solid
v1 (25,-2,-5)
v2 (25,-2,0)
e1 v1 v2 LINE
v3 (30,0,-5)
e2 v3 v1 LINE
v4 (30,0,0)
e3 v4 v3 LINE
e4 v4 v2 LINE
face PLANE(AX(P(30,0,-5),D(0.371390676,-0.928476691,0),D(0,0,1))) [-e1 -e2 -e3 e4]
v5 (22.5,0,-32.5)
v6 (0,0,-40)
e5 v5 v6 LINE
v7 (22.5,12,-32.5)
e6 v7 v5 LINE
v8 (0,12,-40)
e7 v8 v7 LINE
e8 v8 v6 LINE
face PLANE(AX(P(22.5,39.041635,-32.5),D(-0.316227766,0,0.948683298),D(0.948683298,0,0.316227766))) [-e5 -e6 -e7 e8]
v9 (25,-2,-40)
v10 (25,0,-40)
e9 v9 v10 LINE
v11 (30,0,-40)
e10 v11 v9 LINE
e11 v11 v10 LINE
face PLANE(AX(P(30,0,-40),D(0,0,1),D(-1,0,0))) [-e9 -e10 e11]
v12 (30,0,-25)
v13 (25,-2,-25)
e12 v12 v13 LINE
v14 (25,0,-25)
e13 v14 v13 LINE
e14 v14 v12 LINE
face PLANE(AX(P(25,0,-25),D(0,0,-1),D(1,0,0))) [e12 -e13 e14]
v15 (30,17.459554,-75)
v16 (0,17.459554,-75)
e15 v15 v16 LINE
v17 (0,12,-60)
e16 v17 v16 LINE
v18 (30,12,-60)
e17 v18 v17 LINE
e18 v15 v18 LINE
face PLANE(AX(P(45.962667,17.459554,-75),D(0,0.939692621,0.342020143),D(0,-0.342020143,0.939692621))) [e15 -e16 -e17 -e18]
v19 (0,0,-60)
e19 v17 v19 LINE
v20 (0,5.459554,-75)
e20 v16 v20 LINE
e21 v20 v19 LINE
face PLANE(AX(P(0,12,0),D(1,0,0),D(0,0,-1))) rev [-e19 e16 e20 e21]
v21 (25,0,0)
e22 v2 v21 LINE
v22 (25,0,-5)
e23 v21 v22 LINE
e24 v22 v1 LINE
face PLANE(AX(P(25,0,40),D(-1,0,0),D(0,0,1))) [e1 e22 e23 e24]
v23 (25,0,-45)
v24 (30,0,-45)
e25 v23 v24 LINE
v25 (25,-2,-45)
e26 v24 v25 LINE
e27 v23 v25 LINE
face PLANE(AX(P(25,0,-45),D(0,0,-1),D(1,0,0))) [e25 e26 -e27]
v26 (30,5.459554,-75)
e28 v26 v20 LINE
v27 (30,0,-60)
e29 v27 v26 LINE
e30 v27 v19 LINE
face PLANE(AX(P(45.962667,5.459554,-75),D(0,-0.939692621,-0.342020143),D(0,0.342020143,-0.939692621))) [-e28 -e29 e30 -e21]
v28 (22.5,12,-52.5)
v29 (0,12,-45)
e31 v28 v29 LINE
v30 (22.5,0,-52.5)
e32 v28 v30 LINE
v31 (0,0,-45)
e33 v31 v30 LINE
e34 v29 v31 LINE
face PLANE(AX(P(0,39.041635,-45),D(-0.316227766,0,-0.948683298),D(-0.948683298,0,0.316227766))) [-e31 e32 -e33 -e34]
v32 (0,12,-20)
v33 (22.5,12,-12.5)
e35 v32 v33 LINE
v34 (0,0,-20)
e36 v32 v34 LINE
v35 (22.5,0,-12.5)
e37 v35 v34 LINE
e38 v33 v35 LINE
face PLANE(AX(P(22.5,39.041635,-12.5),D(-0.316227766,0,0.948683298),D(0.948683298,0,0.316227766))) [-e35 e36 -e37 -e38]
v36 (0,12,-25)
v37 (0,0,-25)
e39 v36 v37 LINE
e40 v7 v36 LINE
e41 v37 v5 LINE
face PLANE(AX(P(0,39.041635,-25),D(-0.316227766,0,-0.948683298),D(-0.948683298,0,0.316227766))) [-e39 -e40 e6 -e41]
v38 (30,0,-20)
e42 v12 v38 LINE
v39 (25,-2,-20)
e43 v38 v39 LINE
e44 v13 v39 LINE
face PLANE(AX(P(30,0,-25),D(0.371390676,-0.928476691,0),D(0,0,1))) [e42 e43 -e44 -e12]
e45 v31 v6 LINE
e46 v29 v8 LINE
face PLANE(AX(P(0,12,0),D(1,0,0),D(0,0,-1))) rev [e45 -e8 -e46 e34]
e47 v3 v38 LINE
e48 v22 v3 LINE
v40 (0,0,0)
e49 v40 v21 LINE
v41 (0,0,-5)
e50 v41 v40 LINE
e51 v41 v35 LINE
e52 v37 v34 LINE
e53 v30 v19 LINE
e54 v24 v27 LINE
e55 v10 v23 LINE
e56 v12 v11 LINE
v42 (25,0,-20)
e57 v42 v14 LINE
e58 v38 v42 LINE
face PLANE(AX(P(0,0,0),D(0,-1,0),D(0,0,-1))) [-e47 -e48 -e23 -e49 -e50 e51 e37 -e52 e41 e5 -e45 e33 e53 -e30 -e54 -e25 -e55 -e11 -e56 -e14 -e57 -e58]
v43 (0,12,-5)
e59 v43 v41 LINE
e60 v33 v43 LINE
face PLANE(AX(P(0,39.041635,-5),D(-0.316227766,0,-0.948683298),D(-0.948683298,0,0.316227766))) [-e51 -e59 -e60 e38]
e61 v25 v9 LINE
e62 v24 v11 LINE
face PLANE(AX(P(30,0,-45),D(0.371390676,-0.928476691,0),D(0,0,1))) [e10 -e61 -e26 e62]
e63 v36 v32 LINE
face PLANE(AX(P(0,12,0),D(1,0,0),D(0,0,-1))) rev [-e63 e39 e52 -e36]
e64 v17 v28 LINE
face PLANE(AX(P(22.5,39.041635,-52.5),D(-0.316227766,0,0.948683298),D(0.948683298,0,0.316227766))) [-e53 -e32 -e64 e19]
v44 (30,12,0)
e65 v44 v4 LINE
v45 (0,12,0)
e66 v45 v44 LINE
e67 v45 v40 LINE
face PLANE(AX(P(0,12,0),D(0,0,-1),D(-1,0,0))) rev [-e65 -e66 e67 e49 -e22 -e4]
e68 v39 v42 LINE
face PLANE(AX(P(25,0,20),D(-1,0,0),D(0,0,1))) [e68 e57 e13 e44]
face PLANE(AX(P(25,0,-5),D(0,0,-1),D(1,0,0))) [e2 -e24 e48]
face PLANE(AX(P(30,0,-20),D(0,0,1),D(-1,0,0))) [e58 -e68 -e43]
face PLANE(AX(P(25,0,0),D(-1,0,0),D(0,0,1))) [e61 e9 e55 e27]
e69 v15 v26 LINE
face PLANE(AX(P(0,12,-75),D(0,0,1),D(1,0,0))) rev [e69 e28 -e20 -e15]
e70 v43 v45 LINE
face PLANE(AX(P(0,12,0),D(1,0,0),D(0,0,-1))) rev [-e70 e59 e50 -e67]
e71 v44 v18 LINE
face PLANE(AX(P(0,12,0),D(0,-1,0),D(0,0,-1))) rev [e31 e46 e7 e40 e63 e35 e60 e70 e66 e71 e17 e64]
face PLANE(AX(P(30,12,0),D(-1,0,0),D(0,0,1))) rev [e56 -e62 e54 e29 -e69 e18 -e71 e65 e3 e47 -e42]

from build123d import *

# Parameters (mm, degrees)
SKETCH1_W           = 30
SKETCH1_H           = 75
BOSS_EXTRUDE1_DEPTH = 12
CUT_EXTRUDE1_DEPTH  = 12
LPATTERN1_COUNT     = 3
LPATTERN1_PITCH     = 20
CUT_EXTRUDE2_DEPTH  = 30
BOSS_EXTRUDE2_DEPTH = 30
BOUNDARY1_START     = -45
BOUNDARY1_DEPTH     = 5
LPATTERN2_COUNT     = 3
LPATTERN2_PITCH     = 20


# Read off the part's stored shape, not the designer's step: Boundary1
with BuildPart() as part:
    # Sketch1 → Boss-Extrude1 (new body)
    with BuildSketch(Plane(origin=(0, 0, 0), x_dir=(1, 0, 0), z_dir=(0, 1, 0))):
        with Locations((15, 37.5)):
            Rectangle(SKETCH1_W, SKETCH1_H)
    extrude(amount=BOSS_EXTRUDE1_DEPTH)

    # Sketch3 → Cut-Extrude1 (cut)
    with BuildSketch(Plane(origin=(0, 0, 0), x_dir=(1, 0, 0), z_dir=(0, 1, 0))):
        Polygon((0, 5), (22.5, 12.5), (0, 20), align=None)
    cut_extrude1 = extrude(amount=CUT_EXTRUDE1_DEPTH, mode=Mode.SUBTRACT)

    # LPattern1: Cut-Extrude1 ×3
    with Locations(*[(0, 0, -i * LPATTERN1_PITCH) for i in range(1, LPATTERN1_COUNT)]):
        add(cut_extrude1, mode=Mode.SUBTRACT)

    # Sketch6 → Cut-Extrude2 (cut)
    with BuildSketch(Plane(origin=(0, 0, 0), x_dir=(0, 0, -1), z_dir=(1, 0, 0))):
        Polygon((60, 0), (75, 0), (75, 5.459553514), align=None)
    extrude(amount=CUT_EXTRUDE2_DEPTH, mode=Mode.SUBTRACT)

    # Sketch12 → Boss-Extrude2 (add)
    with BuildSketch(Plane.ZY):
        Polygon((-60, 12), (-75, 12), (-75, 17.459553514), align=None)
    extrude(amount=-BOSS_EXTRUDE2_DEPTH)

    # Boundary1 outline → Boundary1 (add)
    with BuildSketch(Plane.XY.offset(BOUNDARY1_START)):
        Polygon((25, 0), (25, -2), (30, 0), align=None)
    boundary1 = extrude(amount=BOUNDARY1_DEPTH)

    # LPattern2: Boundary1 ×3
    with Locations(*[(0, 0, i * LPATTERN2_PITCH) for i in range(1, LPATTERN2_COUNT)]):
        add(boundary1)


solid = part.part
